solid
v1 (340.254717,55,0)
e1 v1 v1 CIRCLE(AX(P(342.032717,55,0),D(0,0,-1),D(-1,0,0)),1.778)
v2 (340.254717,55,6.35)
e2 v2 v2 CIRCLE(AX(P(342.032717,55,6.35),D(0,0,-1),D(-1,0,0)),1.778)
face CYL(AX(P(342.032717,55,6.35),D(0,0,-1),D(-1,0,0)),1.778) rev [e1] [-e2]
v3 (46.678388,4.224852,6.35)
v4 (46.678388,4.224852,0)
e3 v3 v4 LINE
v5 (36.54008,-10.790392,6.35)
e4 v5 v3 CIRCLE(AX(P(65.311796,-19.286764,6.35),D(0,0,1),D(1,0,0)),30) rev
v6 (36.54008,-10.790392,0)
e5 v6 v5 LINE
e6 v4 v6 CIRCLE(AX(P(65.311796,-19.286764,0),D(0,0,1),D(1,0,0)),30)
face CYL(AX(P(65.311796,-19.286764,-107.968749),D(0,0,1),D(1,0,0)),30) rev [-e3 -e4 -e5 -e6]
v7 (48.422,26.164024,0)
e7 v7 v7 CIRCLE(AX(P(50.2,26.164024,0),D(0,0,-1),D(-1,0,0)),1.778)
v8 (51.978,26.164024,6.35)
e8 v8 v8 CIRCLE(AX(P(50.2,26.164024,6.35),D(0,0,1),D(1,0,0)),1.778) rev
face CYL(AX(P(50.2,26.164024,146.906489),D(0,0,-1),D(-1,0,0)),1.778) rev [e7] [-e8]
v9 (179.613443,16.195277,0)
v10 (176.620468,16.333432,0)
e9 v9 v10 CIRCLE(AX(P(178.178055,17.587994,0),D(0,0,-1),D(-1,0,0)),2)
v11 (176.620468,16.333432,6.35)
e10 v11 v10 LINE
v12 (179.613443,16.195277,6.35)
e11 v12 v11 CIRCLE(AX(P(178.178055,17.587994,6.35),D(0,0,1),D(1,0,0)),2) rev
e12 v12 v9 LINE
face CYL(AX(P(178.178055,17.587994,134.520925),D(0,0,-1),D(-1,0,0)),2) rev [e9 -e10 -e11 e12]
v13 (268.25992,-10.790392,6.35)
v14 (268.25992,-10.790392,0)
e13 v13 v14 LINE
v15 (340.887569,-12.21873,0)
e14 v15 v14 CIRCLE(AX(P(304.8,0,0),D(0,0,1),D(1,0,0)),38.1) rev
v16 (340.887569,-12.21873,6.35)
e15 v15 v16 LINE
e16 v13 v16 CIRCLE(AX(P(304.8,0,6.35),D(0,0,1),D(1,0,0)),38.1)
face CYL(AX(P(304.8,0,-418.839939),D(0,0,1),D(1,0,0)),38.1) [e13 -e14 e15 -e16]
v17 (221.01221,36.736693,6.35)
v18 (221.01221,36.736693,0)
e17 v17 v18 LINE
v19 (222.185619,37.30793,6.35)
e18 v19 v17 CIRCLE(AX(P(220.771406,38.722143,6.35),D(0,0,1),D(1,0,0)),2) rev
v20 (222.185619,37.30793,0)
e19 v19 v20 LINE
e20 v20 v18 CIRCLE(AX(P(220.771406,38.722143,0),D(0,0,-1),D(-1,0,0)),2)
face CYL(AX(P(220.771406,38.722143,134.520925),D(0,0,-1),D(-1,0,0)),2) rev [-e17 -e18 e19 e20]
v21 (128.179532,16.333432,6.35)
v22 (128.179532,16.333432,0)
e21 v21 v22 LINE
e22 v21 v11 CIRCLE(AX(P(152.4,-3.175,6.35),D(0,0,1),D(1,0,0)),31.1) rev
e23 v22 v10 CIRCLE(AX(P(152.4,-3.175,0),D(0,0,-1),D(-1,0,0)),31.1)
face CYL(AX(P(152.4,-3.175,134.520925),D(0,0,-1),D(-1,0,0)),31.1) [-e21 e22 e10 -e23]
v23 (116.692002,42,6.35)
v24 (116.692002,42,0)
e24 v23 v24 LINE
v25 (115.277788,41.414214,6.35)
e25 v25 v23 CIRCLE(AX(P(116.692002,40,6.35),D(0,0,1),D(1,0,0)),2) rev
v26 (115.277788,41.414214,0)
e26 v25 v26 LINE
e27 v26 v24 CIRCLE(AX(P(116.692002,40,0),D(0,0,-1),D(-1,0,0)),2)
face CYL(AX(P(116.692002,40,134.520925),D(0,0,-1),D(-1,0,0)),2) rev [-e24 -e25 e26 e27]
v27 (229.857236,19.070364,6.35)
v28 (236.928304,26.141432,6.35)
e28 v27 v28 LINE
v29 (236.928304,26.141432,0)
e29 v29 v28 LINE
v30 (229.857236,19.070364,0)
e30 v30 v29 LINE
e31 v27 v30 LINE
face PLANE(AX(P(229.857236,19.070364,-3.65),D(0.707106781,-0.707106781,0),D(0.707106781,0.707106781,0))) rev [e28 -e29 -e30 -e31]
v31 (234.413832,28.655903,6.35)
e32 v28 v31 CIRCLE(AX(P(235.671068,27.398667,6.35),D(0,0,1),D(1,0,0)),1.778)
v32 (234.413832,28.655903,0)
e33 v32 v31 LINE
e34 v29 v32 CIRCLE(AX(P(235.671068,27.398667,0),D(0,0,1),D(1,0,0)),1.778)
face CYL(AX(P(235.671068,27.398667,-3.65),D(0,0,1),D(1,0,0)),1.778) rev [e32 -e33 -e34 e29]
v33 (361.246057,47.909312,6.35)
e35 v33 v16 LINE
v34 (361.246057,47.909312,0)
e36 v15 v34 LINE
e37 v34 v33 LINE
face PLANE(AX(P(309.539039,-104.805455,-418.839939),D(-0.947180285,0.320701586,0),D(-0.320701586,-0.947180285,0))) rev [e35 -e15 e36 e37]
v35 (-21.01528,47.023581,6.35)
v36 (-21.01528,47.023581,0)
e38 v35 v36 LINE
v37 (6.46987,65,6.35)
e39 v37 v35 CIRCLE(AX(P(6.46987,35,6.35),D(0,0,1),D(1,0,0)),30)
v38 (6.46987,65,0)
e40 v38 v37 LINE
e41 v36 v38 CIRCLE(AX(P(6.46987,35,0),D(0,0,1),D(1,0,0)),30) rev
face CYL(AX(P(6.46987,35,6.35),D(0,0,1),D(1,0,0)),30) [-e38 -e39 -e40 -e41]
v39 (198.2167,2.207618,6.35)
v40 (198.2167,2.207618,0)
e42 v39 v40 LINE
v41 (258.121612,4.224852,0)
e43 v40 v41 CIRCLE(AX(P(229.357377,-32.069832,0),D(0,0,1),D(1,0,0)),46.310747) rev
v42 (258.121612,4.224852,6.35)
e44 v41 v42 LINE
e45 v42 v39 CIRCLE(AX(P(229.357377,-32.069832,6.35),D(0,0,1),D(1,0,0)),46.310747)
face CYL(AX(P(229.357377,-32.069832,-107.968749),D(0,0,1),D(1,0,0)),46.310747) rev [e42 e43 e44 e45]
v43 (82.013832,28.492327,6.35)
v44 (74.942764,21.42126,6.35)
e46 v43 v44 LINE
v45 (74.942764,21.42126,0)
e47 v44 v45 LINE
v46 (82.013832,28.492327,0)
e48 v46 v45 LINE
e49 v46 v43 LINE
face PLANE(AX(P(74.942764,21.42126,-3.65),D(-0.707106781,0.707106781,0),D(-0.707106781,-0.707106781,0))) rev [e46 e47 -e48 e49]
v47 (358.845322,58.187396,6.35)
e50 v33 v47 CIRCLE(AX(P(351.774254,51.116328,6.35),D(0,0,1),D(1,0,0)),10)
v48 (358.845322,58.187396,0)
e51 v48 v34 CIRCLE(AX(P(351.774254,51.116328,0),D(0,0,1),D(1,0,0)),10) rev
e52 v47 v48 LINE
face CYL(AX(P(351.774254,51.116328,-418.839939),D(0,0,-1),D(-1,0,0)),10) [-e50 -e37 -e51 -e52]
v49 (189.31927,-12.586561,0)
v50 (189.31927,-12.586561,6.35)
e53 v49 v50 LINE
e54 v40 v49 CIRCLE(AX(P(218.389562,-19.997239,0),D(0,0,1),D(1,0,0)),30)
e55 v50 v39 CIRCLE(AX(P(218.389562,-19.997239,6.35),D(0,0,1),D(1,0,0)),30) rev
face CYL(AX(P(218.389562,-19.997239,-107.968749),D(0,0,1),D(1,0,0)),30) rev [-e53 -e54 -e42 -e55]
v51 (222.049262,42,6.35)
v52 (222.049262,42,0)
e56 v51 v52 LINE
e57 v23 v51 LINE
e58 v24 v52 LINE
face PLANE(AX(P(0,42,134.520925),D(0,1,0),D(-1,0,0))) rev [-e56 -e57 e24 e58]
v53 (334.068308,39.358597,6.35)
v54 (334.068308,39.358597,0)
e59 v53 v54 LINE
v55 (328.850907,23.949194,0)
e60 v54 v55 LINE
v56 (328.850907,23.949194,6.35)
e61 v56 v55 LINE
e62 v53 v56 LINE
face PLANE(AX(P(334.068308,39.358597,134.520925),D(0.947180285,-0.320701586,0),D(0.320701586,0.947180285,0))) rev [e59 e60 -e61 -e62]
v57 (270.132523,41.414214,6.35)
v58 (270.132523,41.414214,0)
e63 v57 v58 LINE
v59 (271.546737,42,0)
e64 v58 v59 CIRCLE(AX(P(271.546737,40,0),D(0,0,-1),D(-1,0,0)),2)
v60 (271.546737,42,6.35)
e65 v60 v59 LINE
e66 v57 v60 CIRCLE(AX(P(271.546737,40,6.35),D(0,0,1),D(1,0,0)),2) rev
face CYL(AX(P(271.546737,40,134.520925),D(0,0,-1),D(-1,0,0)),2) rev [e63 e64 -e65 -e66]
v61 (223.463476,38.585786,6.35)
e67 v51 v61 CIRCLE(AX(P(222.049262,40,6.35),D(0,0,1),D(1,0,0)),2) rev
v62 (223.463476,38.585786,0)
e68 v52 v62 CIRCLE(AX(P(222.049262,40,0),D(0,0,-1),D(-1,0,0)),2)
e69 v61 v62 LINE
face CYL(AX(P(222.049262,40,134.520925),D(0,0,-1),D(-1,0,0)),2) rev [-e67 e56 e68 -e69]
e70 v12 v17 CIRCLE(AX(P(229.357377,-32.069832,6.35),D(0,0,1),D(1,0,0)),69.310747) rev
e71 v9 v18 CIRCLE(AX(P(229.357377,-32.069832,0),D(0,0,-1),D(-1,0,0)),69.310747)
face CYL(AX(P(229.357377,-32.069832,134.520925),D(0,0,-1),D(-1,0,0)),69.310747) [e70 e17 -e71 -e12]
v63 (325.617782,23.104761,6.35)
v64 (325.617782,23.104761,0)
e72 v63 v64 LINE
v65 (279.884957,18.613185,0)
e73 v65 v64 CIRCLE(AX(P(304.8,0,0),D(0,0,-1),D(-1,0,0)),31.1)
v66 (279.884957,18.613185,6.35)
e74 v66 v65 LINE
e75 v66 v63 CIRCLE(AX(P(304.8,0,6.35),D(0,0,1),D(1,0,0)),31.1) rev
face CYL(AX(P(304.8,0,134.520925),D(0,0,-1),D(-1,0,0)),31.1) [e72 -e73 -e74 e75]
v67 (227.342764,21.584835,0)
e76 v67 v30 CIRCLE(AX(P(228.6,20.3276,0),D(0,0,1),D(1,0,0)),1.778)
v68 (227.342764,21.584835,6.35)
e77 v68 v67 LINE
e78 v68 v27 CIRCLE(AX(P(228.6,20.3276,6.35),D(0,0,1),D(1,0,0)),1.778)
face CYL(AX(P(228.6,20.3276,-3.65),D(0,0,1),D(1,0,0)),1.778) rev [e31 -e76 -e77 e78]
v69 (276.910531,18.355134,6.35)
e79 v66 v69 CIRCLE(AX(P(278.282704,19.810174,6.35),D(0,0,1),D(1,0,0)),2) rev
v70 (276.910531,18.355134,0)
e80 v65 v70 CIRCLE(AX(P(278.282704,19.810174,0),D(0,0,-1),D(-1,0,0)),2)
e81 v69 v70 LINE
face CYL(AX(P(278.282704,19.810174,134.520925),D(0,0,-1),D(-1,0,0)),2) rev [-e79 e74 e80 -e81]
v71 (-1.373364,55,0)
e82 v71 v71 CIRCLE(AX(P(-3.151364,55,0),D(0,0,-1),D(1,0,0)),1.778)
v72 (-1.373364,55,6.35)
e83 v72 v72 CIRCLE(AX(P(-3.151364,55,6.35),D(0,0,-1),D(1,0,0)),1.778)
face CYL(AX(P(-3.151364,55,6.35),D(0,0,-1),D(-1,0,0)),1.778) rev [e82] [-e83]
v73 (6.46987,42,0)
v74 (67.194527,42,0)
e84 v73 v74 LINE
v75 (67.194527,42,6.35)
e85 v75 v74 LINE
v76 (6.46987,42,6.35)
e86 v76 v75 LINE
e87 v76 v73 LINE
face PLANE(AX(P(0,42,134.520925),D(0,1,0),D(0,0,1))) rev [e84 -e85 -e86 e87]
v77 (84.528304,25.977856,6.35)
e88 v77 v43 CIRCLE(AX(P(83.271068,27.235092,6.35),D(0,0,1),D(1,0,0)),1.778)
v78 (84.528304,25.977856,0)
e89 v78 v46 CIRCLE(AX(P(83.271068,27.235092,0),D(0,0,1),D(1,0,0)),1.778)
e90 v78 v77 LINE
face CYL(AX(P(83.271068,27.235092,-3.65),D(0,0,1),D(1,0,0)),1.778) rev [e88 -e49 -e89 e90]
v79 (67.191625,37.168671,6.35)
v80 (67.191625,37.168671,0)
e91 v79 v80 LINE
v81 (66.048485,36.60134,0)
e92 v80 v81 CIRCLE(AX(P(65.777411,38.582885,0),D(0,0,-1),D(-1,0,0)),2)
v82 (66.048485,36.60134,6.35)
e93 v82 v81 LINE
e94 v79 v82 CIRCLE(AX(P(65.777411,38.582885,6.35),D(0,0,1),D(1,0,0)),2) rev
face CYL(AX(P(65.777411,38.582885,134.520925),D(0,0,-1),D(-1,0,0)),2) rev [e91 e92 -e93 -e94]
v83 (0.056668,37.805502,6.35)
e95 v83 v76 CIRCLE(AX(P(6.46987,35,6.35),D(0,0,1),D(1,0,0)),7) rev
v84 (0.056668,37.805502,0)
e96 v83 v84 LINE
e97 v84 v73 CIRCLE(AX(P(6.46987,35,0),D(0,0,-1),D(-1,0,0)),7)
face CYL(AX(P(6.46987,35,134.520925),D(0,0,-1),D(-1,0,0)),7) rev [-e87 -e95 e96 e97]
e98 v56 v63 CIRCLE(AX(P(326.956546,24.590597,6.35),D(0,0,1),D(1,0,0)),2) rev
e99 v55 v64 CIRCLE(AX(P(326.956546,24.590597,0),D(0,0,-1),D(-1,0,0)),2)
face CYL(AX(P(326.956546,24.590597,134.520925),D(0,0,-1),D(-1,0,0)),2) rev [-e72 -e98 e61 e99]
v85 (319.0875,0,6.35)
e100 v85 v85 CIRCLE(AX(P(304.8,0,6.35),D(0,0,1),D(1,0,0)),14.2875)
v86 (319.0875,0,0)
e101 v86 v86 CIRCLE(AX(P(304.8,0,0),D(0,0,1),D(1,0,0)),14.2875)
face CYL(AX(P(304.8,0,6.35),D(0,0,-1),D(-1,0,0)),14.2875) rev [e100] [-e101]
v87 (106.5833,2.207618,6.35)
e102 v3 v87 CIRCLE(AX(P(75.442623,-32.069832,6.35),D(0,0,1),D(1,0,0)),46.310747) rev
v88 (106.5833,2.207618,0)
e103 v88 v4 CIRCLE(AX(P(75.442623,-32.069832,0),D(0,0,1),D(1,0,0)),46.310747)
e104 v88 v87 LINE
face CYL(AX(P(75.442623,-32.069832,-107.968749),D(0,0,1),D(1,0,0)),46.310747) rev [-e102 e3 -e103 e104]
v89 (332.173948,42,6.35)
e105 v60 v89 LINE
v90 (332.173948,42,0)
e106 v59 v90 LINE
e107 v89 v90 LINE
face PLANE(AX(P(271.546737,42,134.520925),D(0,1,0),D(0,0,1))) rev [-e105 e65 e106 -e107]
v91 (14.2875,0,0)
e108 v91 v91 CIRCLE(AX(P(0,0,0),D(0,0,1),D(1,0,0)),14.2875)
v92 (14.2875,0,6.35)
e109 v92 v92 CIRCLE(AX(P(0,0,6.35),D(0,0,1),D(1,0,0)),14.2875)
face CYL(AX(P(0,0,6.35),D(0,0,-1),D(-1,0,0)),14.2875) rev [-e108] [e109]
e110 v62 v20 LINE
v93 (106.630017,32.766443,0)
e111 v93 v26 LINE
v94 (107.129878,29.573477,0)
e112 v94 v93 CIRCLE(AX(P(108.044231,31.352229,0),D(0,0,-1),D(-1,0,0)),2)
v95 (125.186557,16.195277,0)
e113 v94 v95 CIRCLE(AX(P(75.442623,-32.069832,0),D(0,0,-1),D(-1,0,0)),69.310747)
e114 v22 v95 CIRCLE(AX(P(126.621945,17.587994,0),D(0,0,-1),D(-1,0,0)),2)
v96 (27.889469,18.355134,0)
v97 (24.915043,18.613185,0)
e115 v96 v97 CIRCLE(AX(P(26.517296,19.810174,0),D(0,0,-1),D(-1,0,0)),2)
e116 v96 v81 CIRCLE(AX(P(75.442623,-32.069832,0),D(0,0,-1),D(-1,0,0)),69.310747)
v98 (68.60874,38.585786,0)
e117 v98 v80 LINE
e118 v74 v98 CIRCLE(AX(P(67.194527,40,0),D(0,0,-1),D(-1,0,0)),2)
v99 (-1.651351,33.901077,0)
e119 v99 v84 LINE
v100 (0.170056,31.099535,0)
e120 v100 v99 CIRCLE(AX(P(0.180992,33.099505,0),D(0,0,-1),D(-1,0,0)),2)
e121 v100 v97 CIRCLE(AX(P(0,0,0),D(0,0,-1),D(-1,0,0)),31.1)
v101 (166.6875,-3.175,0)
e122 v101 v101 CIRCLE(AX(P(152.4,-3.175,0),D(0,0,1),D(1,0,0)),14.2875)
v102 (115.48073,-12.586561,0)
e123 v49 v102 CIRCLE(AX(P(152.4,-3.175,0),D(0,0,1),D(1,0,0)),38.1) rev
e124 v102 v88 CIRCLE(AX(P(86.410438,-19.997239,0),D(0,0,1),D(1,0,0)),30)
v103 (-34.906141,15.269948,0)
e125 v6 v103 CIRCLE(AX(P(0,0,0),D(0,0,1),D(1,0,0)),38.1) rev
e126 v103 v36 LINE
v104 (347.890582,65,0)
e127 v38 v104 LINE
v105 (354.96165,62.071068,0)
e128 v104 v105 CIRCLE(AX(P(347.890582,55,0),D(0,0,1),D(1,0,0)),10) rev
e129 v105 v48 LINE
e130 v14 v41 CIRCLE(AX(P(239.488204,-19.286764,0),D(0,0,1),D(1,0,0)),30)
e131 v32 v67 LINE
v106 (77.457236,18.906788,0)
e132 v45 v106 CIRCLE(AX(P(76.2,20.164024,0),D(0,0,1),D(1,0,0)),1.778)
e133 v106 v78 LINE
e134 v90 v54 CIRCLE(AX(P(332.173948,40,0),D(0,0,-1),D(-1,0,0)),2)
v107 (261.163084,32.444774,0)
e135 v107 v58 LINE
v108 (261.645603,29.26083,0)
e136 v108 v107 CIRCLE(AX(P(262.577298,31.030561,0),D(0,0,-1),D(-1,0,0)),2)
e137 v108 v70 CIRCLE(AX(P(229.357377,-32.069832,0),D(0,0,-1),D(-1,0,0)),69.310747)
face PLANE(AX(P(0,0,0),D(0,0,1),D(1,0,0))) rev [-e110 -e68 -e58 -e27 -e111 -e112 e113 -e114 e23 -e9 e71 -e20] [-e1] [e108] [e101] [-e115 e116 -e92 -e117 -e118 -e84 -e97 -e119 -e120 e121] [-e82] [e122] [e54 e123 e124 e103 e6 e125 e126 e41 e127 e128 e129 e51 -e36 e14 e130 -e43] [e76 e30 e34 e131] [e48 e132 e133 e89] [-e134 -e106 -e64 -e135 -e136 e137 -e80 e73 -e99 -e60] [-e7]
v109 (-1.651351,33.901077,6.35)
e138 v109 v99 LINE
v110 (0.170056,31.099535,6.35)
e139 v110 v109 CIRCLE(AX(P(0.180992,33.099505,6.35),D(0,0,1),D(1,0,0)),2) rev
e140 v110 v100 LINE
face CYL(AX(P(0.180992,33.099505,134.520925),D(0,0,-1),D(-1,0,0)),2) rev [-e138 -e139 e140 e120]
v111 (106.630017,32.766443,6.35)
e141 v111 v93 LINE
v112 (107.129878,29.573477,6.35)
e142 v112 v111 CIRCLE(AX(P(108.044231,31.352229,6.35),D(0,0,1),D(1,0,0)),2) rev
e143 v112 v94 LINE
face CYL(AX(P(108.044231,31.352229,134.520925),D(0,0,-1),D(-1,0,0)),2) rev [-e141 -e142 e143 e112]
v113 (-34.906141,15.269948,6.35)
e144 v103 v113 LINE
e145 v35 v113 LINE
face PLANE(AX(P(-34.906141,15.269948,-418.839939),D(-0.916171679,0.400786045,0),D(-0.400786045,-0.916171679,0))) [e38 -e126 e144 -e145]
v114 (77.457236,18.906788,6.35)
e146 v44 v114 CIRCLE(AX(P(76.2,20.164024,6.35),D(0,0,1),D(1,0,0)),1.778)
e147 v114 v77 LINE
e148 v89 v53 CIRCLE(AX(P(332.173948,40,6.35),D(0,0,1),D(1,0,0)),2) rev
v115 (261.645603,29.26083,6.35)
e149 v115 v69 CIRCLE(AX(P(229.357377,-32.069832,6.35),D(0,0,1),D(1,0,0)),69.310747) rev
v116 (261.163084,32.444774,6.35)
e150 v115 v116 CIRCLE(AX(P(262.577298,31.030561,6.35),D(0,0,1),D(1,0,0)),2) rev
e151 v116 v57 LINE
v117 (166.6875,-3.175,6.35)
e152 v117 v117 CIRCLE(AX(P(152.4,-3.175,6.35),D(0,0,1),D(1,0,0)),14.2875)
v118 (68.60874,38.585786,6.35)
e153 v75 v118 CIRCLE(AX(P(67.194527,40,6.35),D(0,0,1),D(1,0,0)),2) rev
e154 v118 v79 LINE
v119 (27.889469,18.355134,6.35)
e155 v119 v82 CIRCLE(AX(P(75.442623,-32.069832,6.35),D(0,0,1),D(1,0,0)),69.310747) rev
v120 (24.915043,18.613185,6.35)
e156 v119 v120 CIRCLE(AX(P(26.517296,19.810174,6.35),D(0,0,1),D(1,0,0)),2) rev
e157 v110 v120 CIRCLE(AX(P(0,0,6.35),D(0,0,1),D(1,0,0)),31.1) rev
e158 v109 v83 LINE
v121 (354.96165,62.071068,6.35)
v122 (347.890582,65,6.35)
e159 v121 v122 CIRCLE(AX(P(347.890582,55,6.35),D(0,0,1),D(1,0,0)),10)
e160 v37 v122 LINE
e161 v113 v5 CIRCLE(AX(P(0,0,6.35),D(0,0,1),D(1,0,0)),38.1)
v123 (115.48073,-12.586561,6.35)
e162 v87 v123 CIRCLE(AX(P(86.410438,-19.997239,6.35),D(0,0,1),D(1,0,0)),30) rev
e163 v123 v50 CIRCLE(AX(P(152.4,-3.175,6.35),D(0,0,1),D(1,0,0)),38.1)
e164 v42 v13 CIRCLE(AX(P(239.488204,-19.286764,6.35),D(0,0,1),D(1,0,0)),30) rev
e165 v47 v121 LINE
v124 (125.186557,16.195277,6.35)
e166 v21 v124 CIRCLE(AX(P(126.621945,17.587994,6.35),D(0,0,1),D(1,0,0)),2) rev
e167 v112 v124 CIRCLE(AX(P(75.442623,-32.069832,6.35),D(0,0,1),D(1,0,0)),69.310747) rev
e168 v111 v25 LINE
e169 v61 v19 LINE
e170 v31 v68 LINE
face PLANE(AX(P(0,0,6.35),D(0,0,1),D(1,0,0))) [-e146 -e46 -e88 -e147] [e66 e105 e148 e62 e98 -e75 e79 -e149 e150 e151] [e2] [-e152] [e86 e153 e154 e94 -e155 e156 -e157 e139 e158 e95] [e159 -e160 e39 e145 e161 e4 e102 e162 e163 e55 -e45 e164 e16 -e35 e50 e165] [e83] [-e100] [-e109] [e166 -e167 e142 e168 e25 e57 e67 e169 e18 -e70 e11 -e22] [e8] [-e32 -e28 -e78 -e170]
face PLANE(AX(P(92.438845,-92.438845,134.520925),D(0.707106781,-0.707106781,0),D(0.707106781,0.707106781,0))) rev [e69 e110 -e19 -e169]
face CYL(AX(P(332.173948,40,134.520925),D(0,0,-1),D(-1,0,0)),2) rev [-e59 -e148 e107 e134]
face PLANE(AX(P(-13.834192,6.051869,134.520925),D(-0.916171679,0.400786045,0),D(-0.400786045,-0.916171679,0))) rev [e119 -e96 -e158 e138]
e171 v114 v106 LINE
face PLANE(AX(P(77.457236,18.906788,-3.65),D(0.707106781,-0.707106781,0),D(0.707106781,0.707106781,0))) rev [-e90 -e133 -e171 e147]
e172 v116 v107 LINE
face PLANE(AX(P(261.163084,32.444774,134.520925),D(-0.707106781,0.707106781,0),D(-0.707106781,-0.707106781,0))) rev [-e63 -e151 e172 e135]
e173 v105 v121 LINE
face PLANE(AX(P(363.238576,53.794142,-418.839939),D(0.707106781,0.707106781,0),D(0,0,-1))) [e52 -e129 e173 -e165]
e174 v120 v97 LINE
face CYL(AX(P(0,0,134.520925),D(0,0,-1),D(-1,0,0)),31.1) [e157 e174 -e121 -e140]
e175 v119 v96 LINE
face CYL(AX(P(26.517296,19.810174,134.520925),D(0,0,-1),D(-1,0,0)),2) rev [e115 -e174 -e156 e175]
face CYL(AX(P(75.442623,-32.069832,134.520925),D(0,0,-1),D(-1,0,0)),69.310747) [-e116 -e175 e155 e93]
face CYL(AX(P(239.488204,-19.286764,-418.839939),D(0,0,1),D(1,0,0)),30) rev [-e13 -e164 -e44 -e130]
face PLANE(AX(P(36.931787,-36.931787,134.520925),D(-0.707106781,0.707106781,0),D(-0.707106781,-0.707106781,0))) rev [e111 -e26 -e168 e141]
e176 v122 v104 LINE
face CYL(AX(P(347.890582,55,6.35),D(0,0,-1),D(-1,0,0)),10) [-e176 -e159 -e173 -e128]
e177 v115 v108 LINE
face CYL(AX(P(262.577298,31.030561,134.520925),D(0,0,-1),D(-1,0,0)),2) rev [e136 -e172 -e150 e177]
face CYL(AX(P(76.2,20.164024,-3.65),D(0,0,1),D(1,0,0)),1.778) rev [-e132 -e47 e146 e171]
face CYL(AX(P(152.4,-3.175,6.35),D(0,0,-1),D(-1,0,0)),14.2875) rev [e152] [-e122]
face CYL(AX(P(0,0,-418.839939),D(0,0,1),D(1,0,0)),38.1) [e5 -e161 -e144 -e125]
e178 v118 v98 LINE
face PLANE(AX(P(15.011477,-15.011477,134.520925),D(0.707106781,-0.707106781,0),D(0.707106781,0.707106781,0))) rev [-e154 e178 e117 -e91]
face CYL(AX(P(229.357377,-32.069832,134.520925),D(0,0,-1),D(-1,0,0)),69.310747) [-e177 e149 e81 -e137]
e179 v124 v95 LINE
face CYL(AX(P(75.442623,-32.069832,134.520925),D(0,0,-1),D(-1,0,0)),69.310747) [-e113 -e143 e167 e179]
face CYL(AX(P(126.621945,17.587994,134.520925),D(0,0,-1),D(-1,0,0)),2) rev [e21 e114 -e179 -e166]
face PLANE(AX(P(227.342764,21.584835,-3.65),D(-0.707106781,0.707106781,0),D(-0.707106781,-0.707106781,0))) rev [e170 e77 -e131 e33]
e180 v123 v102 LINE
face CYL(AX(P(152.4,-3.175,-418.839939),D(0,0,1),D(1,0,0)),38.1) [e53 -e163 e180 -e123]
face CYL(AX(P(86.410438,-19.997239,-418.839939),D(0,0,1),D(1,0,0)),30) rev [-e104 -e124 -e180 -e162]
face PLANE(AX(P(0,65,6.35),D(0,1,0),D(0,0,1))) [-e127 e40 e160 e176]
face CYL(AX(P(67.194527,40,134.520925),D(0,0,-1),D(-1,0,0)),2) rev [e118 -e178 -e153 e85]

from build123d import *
from build123d.topology import SkipClean

# Parameters (mm, degrees)
SKETCH1_R           = 14.2875
BOSS_EXTRUDE1_DEPTH = 6.35
FILLET1_R           = 10
FILLET2_R           = 20
SKETCH2_R           = 1.778
CUT_EXTRUDE1_DEPTH  = 6.35
FILLET4_R           = 28.4734
BOSS_EXTRUDE2_DEPTH = 6.35
FILLET7_R           = 30
CUT_EXTRUDE4_DEPTH  = 6.35
FILLET9_DEPTH       = 6.35
SKETCH6_R           = 1.778
CUT_EXTRUDE5_DEPTH  = 10
CHAMFER1_SIZE       = 15
CHAMFER1_SIZE2      = 11.830755168
FILLET11_R          = 10
BOSS_EXTRUDE3_DEPTH = 6.35
SKETCH8_R           = 1.778
BOSS_EXTRUDE4_DEPTH = 6.35
CUT_EXTRUDE6_DEPTH  = 10
FILLET12_R          = 10
FILLET13_R          = 10
FILLET14_R          = 10
FILLET15_R          = 10
FILLET16_R          = 10
CUT_EXTRUDE7_DEPTH  = 10
BOSS_EXTRUDE5_START = -6.35
SKETCH10_R          = 1.778
BOSS_EXTRUDE5_DEPTH = 6.35
FILLET17_R          = 30
BOSS_EXTRUDE6_START = -6.35
BOSS_EXTRUDE6_DEPTH = 6.35


with BuildPart() as part:
    # Sketch1 → Boss-Extrude1 (new body)
    with BuildSketch(Plane.XY):
        with BuildLine():
            Line((76.2, 30), (19.765397885, -21.612188753))
            ThreePointArc((19.765397885, -21.612188753), (-7.664310495, -28.266871084), (-27.975511048, -8.66766623))
            Line((-27.975511048, -8.66766623), (-30.661018302, 0))
            Line((-30.661018302, 0), (-10.522036605, 65))
            Line((-10.522036605, 65), (355.6, 65))
            Line((355.6, 65), (332.775511048, -8.66766623))
            ThreePointArc((332.775511048, -8.66766623), (312.464310495, -28.266871084), (285.034602115, -21.612188753))
            Line((285.034602115, -21.612188753), (228.6, 30))
            Line((228.6, 30), (172.803916322, -24.185422532))
            ThreePointArc((172.803916322, -24.185422532), (152.4, -32.637001398), (131.996083678, -24.185422532))
            Line((131.996083678, -24.185422532), (76.2, 30))
        make_face()
        Circle(SKETCH1_R, mode=Mode.SUBTRACT)
        with Locations((152.4, -3.175)):
            Circle(SKETCH1_R, mode=Mode.SUBTRACT)
        with Locations((304.8, 0)):
            Circle(SKETCH1_R, mode=Mode.SUBTRACT)
    extrude(amount=BOSS_EXTRUDE1_DEPTH)

    # Fillet1
    fillet1_edges = [part.edges().sort_by_distance(p)[0] for p in [
        (-10.522036605, 65, 3.175),
        (355.6, 65, 3.175),
    ]]
    fillet(fillet1_edges, radius=FILLET1_R)

    # Fillet2
    fillet2_edges = [part.edges().sort_by_distance(p)[0] for p in [
        (228.6, 30, 3.175),
        (76.2, 30, 3.175),
    ]]
    fillet(fillet2_edges, radius=FILLET2_R)

    # Sketch2 → Cut-Extrude1 (cut)
    with BuildSketch(Plane(origin=(0, 0, 0), x_dir=(-1, 0, 0), z_dir=(0, 0, -1))):
        with Locations((-229.01165953, 23.51851186)):
            Circle(SKETCH2_R)
        with Locations((-342.03271747, 55)):
            Circle(SKETCH2_R)
        with Locations((-76.34605429, 23.51851186)):
            Circle(SKETCH2_R)
        with Locations(Location((3.151363828, 55, 0), (0, 0, 180))):
            Circle(SKETCH2_R)
    extrude(amount=-CUT_EXTRUDE1_DEPTH, mode=Mode.SUBTRACT)

    # Fillet4
    fillet4_edges = [part.edges().sort_by_distance(p)[0] for p in [
        (-30.661018302, 0, 3.175),
    ]]
    fillet(fillet4_edges, radius=FILLET4_R)

    # Sketch4 → Boss-Extrude2 (add)
    with BuildSketch(Plane.XY.offset(6.35)):
        with BuildLine():
            ThreePointArc((-12.703394916, 57.95951045), (-9.084528898, 63.04969268), (-3.151363828, 65))
            Line((-3.151363828, 65), (-13.151363828, 65))
            Line((-13.151363828, 65), (-34.906140988, 15.269948308))
            ThreePointArc((-34.906140988, 15.269948308), (-10.316360553, -36.676732474), (37.748130536, -5.166105019))
            Line((37.748130536, -5.166105019), (19.765397885, -21.612188753))
            ThreePointArc((19.765397885, -21.612188753), (-7.664310495, -28.266871084), (-27.975511048, -8.66766623))
            Line((-27.975511048, -8.66766623), (-28.050159667, -8.426732485))
            ThreePointArc((-28.050159667, -8.426732485), (-29.325679471, 0), (-28.050159667, 8.426732485))
            Line((-28.050159667, 8.426732485), (-12.703394916, 57.95951045))
        make_face()
        with BuildLine():
            Line((367.03271747, 65), (342.03271747, 65))
            ThreePointArc((342.03271747, 65), (350.08241015, 60.93316507), (351.584748558, 52.04048955))
            Line((351.584748558, 52.04048955), (332.775511048, -8.66766623))
            ThreePointArc((332.775511048, -8.66766623), (312.464310495, -28.266871084), (285.034602115, -21.612188753))
            Line((285.034602115, -21.612188753), (267.051869464, -5.166105019))
            ThreePointArc((267.051869464, -5.166105019), (301.177259665, -37.927374711), (340.887568868, -12.218730424))
            Line((340.887568868, -12.218730424), (367.03271747, 65))
        make_face()
        with BuildLine():
            Line((62.290842982, 17.279399331), (60.592342389, 15.72603792))
            Line((60.592342389, 15.72603792), (68.130864542, 20.996768873))
            ThreePointArc((68.130864542, 20.996768873), (65.048790473, 19.392687011), (62.290842982, 17.279399331))
        make_face()
        with BuildLine():
            ThreePointArc((74.888341467, 22.500495492), (71.444046197, 22.043232685), (68.130864542, 20.996768873))
            Line((68.130864542, 20.996768873), (105.753753933, 1.29937195))
            Line((105.753753933, 1.29937195), (89.721872743, 16.868462091))
            ThreePointArc((89.721872743, 16.868462091), (84.206374965, 20.662880592), (77.747671619, 22.424549857))
            ThreePointArc((77.747671619, 22.424549857), (76.393262458, 25.295885031), (74.888341467, 22.500495492))
        make_face()
        with BuildLine():
            Line((220.832871891, 20.771986703), (256.207126926, 4.751939547))
            Line((256.207126926, 4.751939547), (242.509157018, 17.279399331))
            ThreePointArc((242.509157018, 17.279399331), (236.916143222, 20.892449631), (230.446997722, 22.469184326))
            ThreePointArc((230.446997722, 22.469184326), (229.01165953, 25.29651186), (227.576321337, 22.469184326))
            ThreePointArc((227.576321337, 22.469184326), (224.130268968, 21.915910418), (220.832871891, 20.771986703))
        make_face()
        with BuildLine():
            Line((211.556759647, 13.448745522), (220.832871891, 20.771986703))
            ThreePointArc((220.832871891, 20.771986703), (217.784547298, 19.072249628), (215.078127257, 16.868462091))
            Line((215.078127257, 16.868462091), (211.556759647, 13.448745522))
        make_face()
        with BuildLine():
            Line((131.996083678, -24.185422532), (114.514059271, -7.208050345))
            ThreePointArc((114.514059271, -7.208050345), (152.4, -41.275), (190.285940729, -7.208050345))
            Line((190.285940729, -7.208050345), (172.803916322, -24.185422532))
            ThreePointArc((172.803916322, -24.185422532), (152.4, -32.637001398), (131.996083678, -24.185422532))
        make_face()
    extrude(amount=-BOSS_EXTRUDE2_DEPTH)

    # Fillet7
    # the kernel refuses this fillet: 30 mm, written as the material it adds along each edge
    with BuildSketch(Plane(origin=(220.832871891, 20.771986703, 6.35), x_dir=(-0.7848829847834699, -0.6196440108621978, 0), z_dir=(0, 0, -1))) as fillet7_piece_1:
        with BuildLine():
            CenterArc((18.669895515, -29.207154991), FILLET7_R, 103.201773783, 49.45286053)
            Line((-7.977718615, -15.426564975), (0, 0))
            Line((0, 0), (11.818465203, 0))
        make_face()
    extrude(amount=6.35)
    with BuildSketch(Plane(origin=(68.130864542, 20.996768873, 6.35), x_dir=(-0.819550218760279, -0.5730073637659283, 0), z_dir=(0, 0, -1))) as fillet7_piece_2:
        with BuildLine():
            CenterArc((19.112116789, -28.314616862), FILLET7_R, 109.296600171, 43.297831689)
            Line((-7.521002941, -14.506034983), (0, 0))
            Line((0, 0), (9.198365128, 0))
        make_face()
    extrude(amount=6.35)
    # the kernel refuses this fillet: 30 mm, written as the material it takes off along each edge
    with BuildSketch(Plane(origin=(-13.151363828, 65, 55.403084312), x_dir=(-0.4007860448353176, -0.9161716794713002, 0), z_dir=(0, 0, -1))) as fillet7_2_piece_1:
        with BuildLine():
            CenterArc((FILLET7_R * 0.65404112416, -FILLET7_R), FILLET7_R, 90, 66.372672864)
            Line((-FILLET7_R * 0.262130555312, -FILLET7_R * 0.599213955165), (0, 0))
            Line((0, 0), (FILLET7_R * 0.65404112416, 0))
        make_face()
    extrude(amount=104.456168624, mode=Mode.SUBTRACT)

    # Sketch5 → Cut-Extrude4 (cut)
    with BuildSketch(Plane.XY.offset(6.35)):
        with BuildLine():
            ThreePointArc((202.727550006, 25.783673337), (222.609463156, 31.248183301), (242.841525508, 27.271376461))
            Line((242.841525508, 27.271376461), (264.569178734, 17.431507638))
            Line((264.569178734, 17.431507638), (281.763141289, 1.706792524))
            ThreePointArc((281.763141289, 1.706792524), (305.653980027, 23.084209281), (327.9, 0))
            ThreePointArc((327.9, 0), (327.592925131, -3.754006392), (326.679864589, -7.408206635))
            Line((326.679864589, -7.408206635), (346.117455511, 50))
            Line((346.117455511, 50), (6.469869897, 50))
            ThreePointArc((6.469869897, 50), (-1.740585021, 47.553423041), (-7.272705295, 41.011790673))
            Line((-7.272705295, 41.011790673), (-21.163565796, 9.258157636))
            ThreePointArc((-21.163565796, 9.258157636), (3.890126649, 22.770088156), (23.036858711, 1.706792524))
            Line((23.036858711, 1.706792524), (52.825875761, 28.950297628))
            ThreePointArc((52.825875761, 28.950297628), (71.4348738, 31.756464685), (89.564149012, 26.706834809))
            Line((89.564149012, 26.706834809), (114.641099784, 13.577841769))
            Line((114.641099784, 13.577841769), (129.424605527, -0.77890968))
            ThreePointArc((129.424605527, -0.77890968), (152.4, 19.925), (175.375394473, -0.77890968))
            Line((175.375394473, -0.77890968), (202.727550006, 25.783673337))
        make_face()
    extrude(amount=-CUT_EXTRUDE4_DEPTH, mode=Mode.SUBTRACT)

    # Fillet9: read off the stored shape, not the designer's step
    # Fillet9 outline → Fillet9 (add)
    with BuildSketch(Plane.XY):
        with BuildLine():
            Line((346.117455511, 50), (332.173947538, 50))
            ThreePointArc((332.173947538, 50), (340.300144637, 45.827943094), (341.64575039, 36.792984141))
            Line((341.64575039, 36.792984141), (346.117455511, 50))
        make_face()
        with BuildLine():
            Line((326.679864589, -7.408206635), (336.428348814, 21.383581349))
            ThreePointArc((336.428348814, 21.383581349), (329.483593888, 14.915162915), (320.262725429, 17.161413762))
            ThreePointArc((320.262725429, 17.161413762), (327.150253218, 5.837480712), (326.679864589, -7.408206635))
        make_face()
        with BuildLine():
            ThreePointArc((0.126311649, 23.099654659), (-8.202890478, 27.648769951), (-8.980724779, 37.107365609))
            Line((-8.980724779, 37.107365609), (-21.163565796, 9.258157636))
            ThreePointArc((-21.163565796, 9.258157636), (-12.591198333, 19.366768562), (0.126311649, 23.099654659))
        make_face()
    extrude(amount=FILLET9_DEPTH)

    # Sketch6 → Cut-Extrude5 (cut)
    with BuildSketch(Plane.XY.offset(6.35)):
        with Locations((76.2, 20.164023691)):
            Circle(SKETCH6_R)
        with Locations((228.6, 20.32759964)):
            Circle(SKETCH6_R)
    extrude(amount=-CUT_EXTRUDE5_DEPTH, mode=Mode.SUBTRACT)

    # Chamfer1
    chamfer1_edges = [part.edges().sort_by_distance(p)[0] for p in [
        (367.03271747, 65, 3.175),
    ]]
    chamfer1_side = [part.faces().sort_by_distance(p)[0] for p in [
        (186.751293683, 65, 3.175),
    ]]
    chamfer(chamfer1_edges, length=CHAMFER1_SIZE, length2=CHAMFER1_SIZE2, reference=chamfer1_side[0])

    # Fillet11
    fillet11_edges = [part.edges().sort_by_distance(p)[0] for p in [
        (363.238575525, 53.794141945, 3.175),
        (352.03271747, 65, 3.175),
    ]]
    fillet(fillet11_edges, radius=FILLET11_R)

    # Sketch7 → Boss-Extrude3 (add)
    with BuildSketch(Plane.XY.offset(6.35)):
        Polygon((100.225182041, 58.888519513), (69.228437645, 27.891775117), (86.023226415, 23.473360451), (115.72256861, 53.172702646), align=None)
        Polygon((224.083172996, 27.891775117), (239.038298252, 21.633696938), (270.57730396, 53.172702646), (247.971808558, 51.78041068), align=None)
    extrude(amount=-BOSS_EXTRUDE3_DEPTH)

    # Sketch8 → Boss-Extrude4 (add)
    # profile 1 of 8: a face of its own
    with BuildSketch(Plane.XY.offset(6.35)):
        with BuildLine():
            Line((42.965540082, 19.932541018), (26.540335697, 4.910892646))
            ThreePointArc((26.540335697, 4.910892646), (26.03493106, 4.232890698), (25.538925832, 3.547982455))
            Line((25.538925832, 3.547982455), (37.748130536, -5.166105019))
            ThreePointArc((37.748130536, -5.166105019), (44.188663643, 2.104358832), (52.003991477, 7.871573252))
            Line((52.003991477, 7.871573252), (60.592342389, 15.72603792))
            ThreePointArc((60.592342389, 15.72603792), (71.406290885, 16.717093686), (81.86459706, 13.793481951))
            ThreePointArc((81.86459706, 13.793481951), (100.496139451, 6.878937362), (114.514059271, -7.208050345))
            Line((114.514059271, -7.208050345), (127.169254419, 0.844653286))
            ThreePointArc((127.169254419, 0.844653286), (126.658671717, 1.633641021), (126.136055565, 2.414709969))
            Line((126.136055565, 2.414709969), (114.641099784, 13.577841769))
            Line((114.641099784, 13.577841769), (89.564149012, 26.706834809))
            ThreePointArc((89.564149012, 26.706834809), (89.463102992, 26.759574333), (89.361923711, 26.812057747))
            Line((89.361923711, 26.812057747), (90.030119482, 27.480253519))
            ThreePointArc((90.030119482, 27.480253519), (80.261374749, 29.051255746), (70.367134521, 29.030471993))
            ThreePointArc((70.367134521, 29.030471993), (56.12315118, 26.117501091), (42.965540082, 19.932541018))
        make_face()
        with Locations((76.2, 20.164023691)):
            Circle(SKETCH8_R, mode=Mode.SUBTRACT)
    # profile 2 of 8: a face of its own
    with BuildSketch(Plane.XY.offset(6.35)):
        with BuildLine():
            ThreePointArc((126.136055565, 2.414709969), (110.406465662, 18.294217169), (90.030119482, 27.480253519))
            Line((90.030119482, 27.480253519), (89.361923711, 26.812057747))
            ThreePointArc((89.361923711, 26.812057747), (89.463102992, 26.759574333), (89.564149012, 26.706834809))
            Line((89.564149012, 26.706834809), (114.641099784, 13.577841769))
            Line((114.641099784, 13.577841769), (126.136055565, 2.414709969))
        make_face()
    # profile 3 of 8: a face of its own
    with BuildSketch(Plane.XY.offset(6.35)):
        with BuildLine():
            Line((60.592342389, 15.72603792), (52.003991477, 7.871573252))
            ThreePointArc((52.003991477, 7.871573252), (66.43379909, 13.356222223), (81.86459706, 13.793481951))
            ThreePointArc((81.86459706, 13.793481951), (71.406290885, 16.717093686), (60.592342389, 15.72603792))
        make_face()
    # profile 4 of 8: a face of its own
    with BuildSketch(Plane.XY.offset(6.35)):
        with BuildLine():
            Line((196.372099466, 19.611685086), (178.663944435, 2.414709969))
            ThreePointArc((178.663944435, 2.414709969), (178.141328283, 1.633641021), (177.630745581, 0.844653286))
            Line((177.630745581, 0.844653286), (190.285940729, -7.208050345))
            ThreePointArc((190.285940729, -7.208050345), (197.093762385, 1.152818304), (205.650401581, 7.712885828))
            Line((205.650401581, 7.712885828), (211.556759647, 13.448745522))
            ThreePointArc((211.556759647, 13.448745522), (223.983698914, 16.277662761), (236.463614039, 13.692452762))
            ThreePointArc((236.463614039, 13.692452762), (253.661443339, 7.350945008), (267.051869464, -5.166105019))
            Line((267.051869464, -5.166105019), (279.261074168, 3.547982455))
            ThreePointArc((279.261074168, 3.547982455), (278.76506894, 4.232890698), (278.259664303, 4.910892646))
            Line((278.259664303, 4.910892646), (264.569178734, 17.431507638))
            Line((264.569178734, 17.431507638), (244.104163185, 26.699561871))
            Line((244.104163185, 26.699561871), (244.695857174, 27.29125586))
            ThreePointArc((244.695857174, 27.29125586), (235.069370607, 28.974257477), (225.297764534, 29.106366656))
            ThreePointArc((225.297764534, 29.106366656), (210.236231282, 26.182975027), (196.372099466, 19.611685086))
        make_face()
        with Locations((228.6, 20.32759964)):
            Circle(SKETCH8_R, mode=Mode.SUBTRACT)
    # profile 5 of 8: a face of its own
    with BuildSketch(Plane.XY.offset(6.35)):
        with BuildLine():
            Line((211.556759647, 13.448745522), (205.650401581, 7.712885828))
            ThreePointArc((205.650401581, 7.712885828), (220.5349661, 13.392794234), (236.463614039, 13.692452762))
            ThreePointArc((236.463614039, 13.692452762), (223.983698914, 16.277662761), (211.556759647, 13.448745522))
        make_face()
    # profile 6 of 8: a face of its own
    with BuildSketch(Plane.XY.offset(6.35)):
        with BuildLine():
            ThreePointArc((278.259664303, 4.910892646), (263.371186182, 18.940642396), (244.695857174, 27.29125586))
            Line((244.695857174, 27.29125586), (244.104163185, 26.699561871))
            Line((244.104163185, 26.699561871), (264.569178734, 17.431507638))
            Line((264.569178734, 17.431507638), (278.259664303, 4.910892646))
        make_face()
    # profile 7 of 8: a face of its own
    with BuildSketch(Plane.XY.offset(6.35)):
        with BuildLine():
            ThreePointArc((196.372099466, 19.611685086), (186.64361318, 11.913598089), (178.663944435, 2.414709969))
            Line((178.663944435, 2.414709969), (196.372099466, 19.611685086))
        make_face()
    # profile 8 of 8: a face of its own
    with BuildSketch(Plane.XY.offset(6.35)):
        with BuildLine():
            ThreePointArc((42.965540082, 19.932541018), (34.065540526, 13.173341548), (26.540335697, 4.910892646))
            Line((26.540335697, 4.910892646), (42.965540082, 19.932541018))
        make_face()
    extrude(amount=-BOSS_EXTRUDE4_DEPTH)

    # Sketch8<3> → Cut-Extrude6 (cut)
    with SkipClean():  # the faces are left unmerged after this step: merging them gives an invalid solid
        with BuildSketch(Plane.XY.offset(6.35)):
            with BuildLine():
                Line((26.540335697, 4.910892646), (23.036858711, 1.706792524))
                ThreePointArc((23.036858711, 1.706792524), (23.086771831, 0.781643421), (23.099546395, -0.144763074))
                ThreePointArc((23.099546395, -0.144763074), (24.756867192, 2.425991729), (26.540335697, 4.910892646))
            make_face()
            with BuildLine():
                Line((52.825875761, 28.950297628), (42.965540082, 19.932541018))
                ThreePointArc((42.965540082, 19.932541018), (56.12315118, 26.117501091), (70.367134521, 29.030471993))
                Line((70.367134521, 29.030471993), (72.972728384, 31.636065856))
                ThreePointArc((72.972728384, 31.636065856), (62.745683135, 31.445529161), (52.825875761, 28.950297628))
            make_face()
            with BuildLine():
                ThreePointArc((52.003991477, 7.871573252), (44.188663643, 2.104358832), (37.748130536, -5.166105019))
                Line((37.748130536, -5.166105019), (52.003991477, 7.871573252))
            make_face()
            with BuildLine():
                Line((105.753753933, 1.29937195), (114.514059271, -7.208050345))
                ThreePointArc((114.514059271, -7.208050345), (100.496139451, 6.878937362), (81.86459706, 13.793481951))
                ThreePointArc((81.86459706, 13.793481951), (82.236984648, 13.608280674), (82.606769012, 13.417934797))
                Line((82.606769012, 13.417934797), (105.753753933, 1.29937195))
            make_face()
            with BuildLine():
                ThreePointArc((126.136055565, 2.414709969), (127.78416506, -0.142246527), (129.303415047, -2.777805464))
                ThreePointArc((129.303415047, -2.777805464), (129.342339274, -1.777043687), (129.424605527, -0.77890968))
                Line((129.424605527, -0.77890968), (126.136055565, 2.414709969))
            make_face()
            with BuildLine():
                ThreePointArc((205.650401581, 7.712885828), (197.093762385, 1.152818304), (190.285940729, -7.208050345))
                Line((190.285940729, -7.208050345), (205.650401581, 7.712885828))
            make_face()
            with BuildLine():
                Line((256.207126926, 4.751939547), (267.051869464, -5.166105019))
                ThreePointArc((267.051869464, -5.166105019), (253.661443339, 7.350945008), (236.463614039, 13.692452762))
                ThreePointArc((236.463614039, 13.692452762), (236.558593891, 13.65003287), (236.653426084, 13.6072839))
                Line((236.653426084, 13.6072839), (256.207126926, 4.751939547))
            make_face()
            with BuildLine():
                ThreePointArc((175.496584953, -2.777805464), (177.01583494, -0.142246527), (178.663944435, 2.414709969))
                Line((178.663944435, 2.414709969), (175.375394473, -0.77890968))
                ThreePointArc((175.375394473, -0.77890968), (175.457660726, -1.777043687), (175.496584953, -2.777805464))
            make_face()
            with BuildLine():
                ThreePointArc((278.259664303, 4.910892646), (280.043132809, 2.425991728), (281.700453605, -0.144763074))
                ThreePointArc((281.700453605, -0.144763074), (281.713228169, 0.781643421), (281.763141289, 1.706792524))
                Line((281.763141289, 1.706792524), (278.259664303, 4.910892646))
            make_face()
            with BuildLine():
                Line((225.297764534, 29.106366656), (227.364470932, 31.173073053))
                ThreePointArc((227.364470932, 31.173073053), (214.660742934, 30.239572268), (202.727550006, 25.783673337))
                Line((202.727550006, 25.783673337), (196.372099466, 19.611685086))
                ThreePointArc((196.372099466, 19.611685086), (210.236231282, 26.182975027), (225.297764534, 29.106366656))
            make_face()
        extrude(amount=-CUT_EXTRUDE6_DEPTH, mode=Mode.SUBTRACT)

    # Fillet12
    fillet12_edges = [part.edges().sort_by_distance(p)[0] for p in [
        (23.099546395, -0.144763074, 3.175),
    ]]
    fillet(fillet12_edges, radius=FILLET12_R)

    # Fillet13
    fillet13_edges = [part.edges().sort_by_distance(p)[0] for p in [
        (129.303415047, -2.777805464, 3.175),
        (175.496584953, -2.777805464, 3.175),
        (281.700453605, -0.144763074, 3.175),
    ]]
    fillet(fillet13_edges, radius=FILLET13_R)

    # Fillet14
    fillet14_edges = [part.edges().sort_by_distance(p)[0] for p in [
        (225.297764534, 29.106366656, 3.175),
        (70.367134521, 29.030471993, 3.175),
    ]]
    fillet(fillet14_edges, radius=FILLET14_R)

    # Fillet15
    fillet15_edges = [part.edges().sort_by_distance(p)[0] for p in [
        (267.404601314, 50, 3.175),
        (91.336662528, 50, 3.175),
        (112.549865964, 50, 3.175),
        (244.695857174, 27.29125586, 3.175),
        (90.030119482, 27.480253519, 3.175),
    ]]
    fillet(fillet15_edges, radius=FILLET15_R)

    # Fillet16
    fillet16_edges = [part.edges().sort_by_distance(p)[0] for p in [
        (246.191397879, 50, 3.175),
    ]]
    fillet(fillet16_edges, radius=FILLET16_R)

    # Sketch9 → Cut-Extrude7 (cut)
    with SkipClean():  # the faces are left unmerged after this step: merging them gives an invalid solid
        with BuildSketch(Plane.XY.offset(6.35)):
            with BuildLine():
                Line((74.942764143, 21.421259548), (82.013831955, 28.49232736))
                ThreePointArc((82.013831955, 28.49232736), (84.528303669, 28.49232736), (84.528303669, 25.977855646))
                Line((84.528303669, 25.977855646), (77.457235857, 18.906787834))
                ThreePointArc((77.457235857, 18.906787834), (74.942764143, 18.906787834), (74.942764143, 21.421259548))
            make_face()
            with BuildLine():
                Line((227.342764143, 21.584835497), (234.413831955, 28.655903309))
                ThreePointArc((234.413831955, 28.655903309), (236.928303669, 28.655903309), (236.928303669, 26.141431595))
                Line((236.928303669, 26.141431595), (229.857235857, 19.070363783))
                ThreePointArc((229.857235857, 19.070363783), (227.342764143, 19.070363783), (227.342764143, 21.584835497))
            make_face()
        extrude(amount=-CUT_EXTRUDE7_DEPTH, mode=Mode.SUBTRACT)

    # Sketch10 → Boss-Extrude5 (add)
    # profile 1 of 3: a face of its own
    with SkipClean():  # the faces are left unmerged after this step: merging them gives an invalid solid
        with BuildSketch(Plane(origin=(0, 0, 0), x_dir=(-1, 0, 0), z_dir=(0, 0, -1)).offset(BOSS_EXTRUDE5_START)):
            with BuildLine():
                ThreePointArc((-67.194526904, 50), (-76.433322229, 43.826834324), (-74.265594716, 32.928932188))
                Line((-74.265594716, 32.928932188), (-72.848479306, 31.511816778))
                ThreePointArc((-72.848479306, 31.511816778), (-70.222953971, 29.625365286), (-67.132776867, 28.675161103))
                ThreePointArc((-67.132776867, 28.675161103), (-54.584312682, 25.583776849), (-42.962627059, 19.930721632))
                ThreePointArc((-42.962627059, 19.930721632), (-41.828685193, 19.205024398), (-40.71095078, 18.45460424))
                ThreePointArc((-40.71095078, 18.45460424), (-36.930649094, 15.635886475), (-33.378159261, 12.534972634))
                ThreePointArc((-33.378159261, 12.534972634), (-25.652977382, 9.847596586), (-18.506028464, 13.825227321))
                ThreePointArc((-18.506028464, 13.825227321), (-10.406477556, 20.623172037), (-0.126311649, 23.099654659))
                ThreePointArc((-0.126311649, 23.099654659), (8.202890478, 27.648769951), (8.980724779, 37.107365609))
                Line((8.980724779, 37.107365609), (7.272705295, 41.011790673))
                ThreePointArc((7.272705295, 41.011790673), (1.740585021, 47.553423041), (-6.469869897, 50))
                Line((-6.469869897, 50), (-67.194526904, 50))
            make_face()
            with Locations((-50.2, 26.164023691)):
                Circle(SKETCH10_R, mode=Mode.SUBTRACT)
            with BuildLine():
                Line((-69.3129454, 35.047350684), (-70.73006081, 36.464466094))
                ThreePointArc((-70.73006081, 36.464466094), (-71.813924567, 41.913417162), (-67.194526904, 45))
                Line((-67.194526904, 45), (-6.469869897, 45))
                ThreePointArc((-6.469869897, 45), (-0.996233285, 43.368948694), (2.691846898, 39.007860448))
                Line((2.691846898, 39.007860448), (4.399866381, 35.103435385))
                ThreePointArc((4.399866381, 35.103435385), (4.010949231, 30.374137556), (-0.153651832, 28.09957991))
                ThreePointArc((-0.153651832, 28.09957991), (-12.658961876, 25.087062088), (-22.511662331, 16.817700767))
                ThreePointArc((-22.511662331, 16.817700767), (-26.08513679, 14.8288854), (-29.947727729, 16.172573424))
                ThreePointArc((-29.947727729, 16.172573424), (-46.837281896, 27.753655452), (-66.455094181, 33.629022846))
                ThreePointArc((-66.455094181, 33.629022846), (-68.000182733, 34.104124938), (-69.3129454, 35.047350684))
            make_face(mode=Mode.SUBTRACT)
        # profile 2 of 3: a face of its own
        with BuildSketch(Plane(origin=(0, 0, 0), x_dir=(-1, 0, 0), z_dir=(0, 0, -1)).offset(BOSS_EXTRUDE5_START)):
            with BuildLine():
                ThreePointArc((-222.049262255, 50), (-231.28805758, 43.826834324), (-229.120330067, 32.928932188))
                Line((-229.120330067, 32.928932188), (-227.84247345, 31.651075572))
                ThreePointArc((-227.84247345, 31.651075572), (-225.148473717, 29.730965761), (-221.975427684, 28.794891452))
                ThreePointArc((-221.975427684, 28.794891452), (-202.106159082, 22.851738113), (-185.354998338, 10.624411336))
                ThreePointArc((-185.354998338, 10.624411336), (-177.7169483, 7.598630206), (-170.390122667, 11.315185866))
                ThreePointArc((-170.390122667, 11.315185866), (-152.4, 19.925), (-134.409877333, 11.315185866))
                ThreePointArc((-134.409877333, 11.315185866), (-127.0830517, 7.598630206), (-119.445001662, 10.624411336))
                ThreePointArc((-119.445001662, 10.624411336), (-111.941546557, 17.193098502), (-103.47246446, 22.458470097))
                ThreePointArc((-103.47246446, 22.458470097), (-98.164563741, 29.805562574), (-100.973163037, 38.423297073))
                Line((-100.973163037, 38.423297073), (-109.620933775, 47.071067812))
                ThreePointArc((-109.620933775, 47.071067812), (-112.865167264, 49.238795325), (-116.692001587, 50))
                Line((-116.692001587, 50), (-222.049262255, 50))
            make_face()
            with BuildLine():
                Line((-222.049262255, 45), (-116.692001587, 45))
                ThreePointArc((-116.692001587, 45), (-114.778584426, 44.619397663), (-113.156467681, 43.535533906))
                Line((-113.156467681, 43.535533906), (-104.508696943, 34.887763168))
                ThreePointArc((-104.508696943, 34.887763168), (-103.104397295, 30.578895918), (-105.758347654, 26.905349679))
                ThreePointArc((-105.758347654, 26.905349679), (-114.918098395, 21.210577706), (-123.033473552, 14.106202468))
                ThreePointArc((-123.033473552, 14.106202468), (-126.852498572, 12.593311904), (-130.515911388, 14.451589733))
                ThreePointArc((-130.515911388, 14.451589733), (-152.4, 24.925), (-174.284088612, 14.451589733))
                ThreePointArc((-174.284088612, 14.451589733), (-177.947501428, 12.593311904), (-181.766526448, 14.106202468))
                ThreePointArc((-181.766526448, 14.106202468), (-199.883774016, 27.330689399), (-221.373416661, 33.758517418))
                ThreePointArc((-221.373416661, 33.758517418), (-222.959939678, 34.226554572), (-224.306939544, 35.186609478))
                Line((-224.306939544, 35.186609478), (-225.584796161, 36.464466094))
                ThreePointArc((-225.584796161, 36.464466094), (-226.668659917, 41.913417162), (-222.049262255, 45))
            make_face(mode=Mode.SUBTRACT)
        # profile 3 of 3: a face of its own
        with BuildSketch(Plane(origin=(0, 0, 0), x_dir=(-1, 0, 0), z_dir=(0, 0, -1)).offset(BOSS_EXTRUDE5_START)):
            with BuildLine():
                ThreePointArc((-257.918824258, 22.181909427), (-252.690189928, 29.532193538), (-255.506229694, 38.10162838))
                Line((-255.506229694, 38.10162838), (-264.475669126, 47.071067812))
                ThreePointArc((-264.475669126, 47.071067812), (-267.719902614, 49.238795325), (-271.546736938, 50))
                Line((-271.546736938, 50), (-332.173947538, 50))
                ThreePointArc((-332.173947538, 50), (-340.300144637, 45.827943094), (-341.64575039, 36.792984141))
                Line((-341.64575039, 36.792984141), (-336.428348814, 21.383581349))
                ThreePointArc((-336.428348814, 21.383581349), (-329.483593889, 14.915162915), (-320.262725429, 17.161413762))
                ThreePointArc((-320.262725429, 17.161413762), (-302.54213412, 22.989389763), (-286.293971536, 13.825227321))
                ThreePointArc((-286.293971536, 13.825227321), (-279.147022618, 9.847596586), (-271.421840739, 12.534972634))
                ThreePointArc((-271.421840739, 12.534972634), (-264.998233798, 17.817411245), (-257.918824258, 22.181909427))
            make_face()
            with BuildLine():
                Line((-268.011203032, 43.535533906), (-259.0417636, 34.566094474))
                ThreePointArc((-259.0417636, 34.566094474), (-257.633743717, 30.281377053), (-260.248060882, 26.606234998))
                ThreePointArc((-260.248060882, 26.606234998), (-267.904808807, 21.885804259), (-274.852272271, 16.172573424))
                ThreePointArc((-274.852272271, 16.172573424), (-278.71486321, 14.8288854), (-282.288337669, 16.817700767))
                ThreePointArc((-282.288337669, 16.817700767), (-302.053418561, 27.965448153), (-323.609635695, 20.876005485))
                ThreePointArc((-323.609635695, 20.876005485), (-328.220069925, 19.752880062), (-331.692447387, 22.987089279))
                Line((-331.692447387, 22.987089279), (-336.909848964, 38.39649207))
                ThreePointArc((-336.909848964, 38.39649207), (-336.237046087, 42.913971547), (-332.173947538, 45))
                Line((-332.173947538, 45), (-271.546736938, 45))
                ThreePointArc((-271.546736938, 45), (-269.633319776, 44.619397663), (-268.011203032, 43.535533906))
            make_face(mode=Mode.SUBTRACT)
        extrude(amount=BOSS_EXTRUDE5_DEPTH)

    # Fillet17
    fillet17_edges = [part.edges().sort_by_distance(p)[0] for p in [
        (190.285940729, -7.208050345, 3.175),
        (267.051869464, -5.166105019, 3.175),
        (114.514059271, -7.208050345, 3.175),
        (37.748130536, -5.166105019, 3.175),
    ]]
    fillet(fillet17_edges, radius=FILLET17_R)

    # Sketch11 → Boss-Extrude6 (add)
    # profile 1 of 3: a face of its own
    with SkipClean():  # the faces are left unmerged after this step: merging them gives an invalid solid
        with BuildSketch(Plane(origin=(0, 0, 0), x_dir=(-1, 0, 0), z_dir=(0, 0, -1)).offset(BOSS_EXTRUDE6_START)):
            with BuildLine():
                ThreePointArc((2.691846898, 39.007860448), (-0.996233285, 43.368948694), (-6.469869897, 45))
                Line((-6.469869897, 45), (-67.194526904, 45))
                ThreePointArc((-67.194526904, 45), (-71.813924567, 41.913417162), (-70.73006081, 36.464466094))
                Line((-70.73006081, 36.464466094), (-69.3129454, 35.047350684))
                ThreePointArc((-69.3129454, 35.047350684), (-68.000182733, 34.104124938), (-66.455094181, 33.629022846))
                ThreePointArc((-66.455094181, 33.629022846), (-46.837281896, 27.753655452), (-29.947727729, 16.172573424))
                ThreePointArc((-29.947727729, 16.172573424), (-26.08513679, 14.8288854), (-22.511662331, 16.817700767))
                ThreePointArc((-22.511662331, 16.817700767), (-12.658961876, 25.087062088), (-0.153651832, 28.09957991))
                ThreePointArc((-0.153651832, 28.09957991), (4.010949231, 30.374137556), (4.399866381, 35.103435385))
                Line((4.399866381, 35.103435385), (2.691846898, 39.007860448))
            make_face()
            with BuildLine():
                Line((-67.194526904, 42), (-6.469869897, 42))
                ThreePointArc((-6.469869897, 42), (-2.638324268, 40.858264086), (-0.05666814, 37.805502314))
                Line((-0.05666814, 37.805502314), (1.651351343, 33.90107725))
                ThreePointArc((1.651351343, 33.90107725), (1.495784483, 32.009358119), (-0.170055943, 31.09953506))
                ThreePointArc((-0.170055943, 31.09953506), (-14.010452468, 27.765396119), (-24.915042651, 18.613184835))
                ThreePointArc((-24.915042651, 18.613184835), (-26.344432434, 17.817658688), (-27.88946881, 18.355133898))
                ThreePointArc((-27.88946881, 18.355133898), (-45.543132337, 30.460161857), (-66.048484569, 36.601339893))
                ThreePointArc((-66.048484569, 36.601339893), (-66.66651999, 36.791380729), (-67.191625057, 37.168671028))
                Line((-67.191625057, 37.168671028), (-68.608740467, 38.585786438))
                ThreePointArc((-68.608740467, 38.585786438), (-69.042285969, 40.765366865), (-67.194526904, 42))
            make_face(mode=Mode.SUBTRACT)
        # profile 2 of 3: a face of its own
        with BuildSketch(Plane(origin=(0, 0, 0), x_dir=(-1, 0, 0), z_dir=(0, 0, -1)).offset(BOSS_EXTRUDE6_START)):
            with BuildLine():
                ThreePointArc((-105.758347654, 26.905349679), (-103.104397295, 30.578895918), (-104.508696943, 34.887763168))
                Line((-104.508696943, 34.887763168), (-113.156467681, 43.535533906))
                ThreePointArc((-113.156467681, 43.535533906), (-114.778584426, 44.619397663), (-116.692001587, 45))
                Line((-116.692001587, 45), (-222.049262255, 45))
                ThreePointArc((-222.049262255, 45), (-226.668659917, 41.913417162), (-225.584796161, 36.464466094))
                Line((-225.584796161, 36.464466094), (-224.306939544, 35.186609478))
                ThreePointArc((-224.306939544, 35.186609478), (-222.959939678, 34.226554572), (-221.373416661, 33.758517418))
                ThreePointArc((-221.373416661, 33.758517418), (-199.883774016, 27.330689399), (-181.766526448, 14.106202468))
                ThreePointArc((-181.766526448, 14.106202468), (-177.947501428, 12.593311904), (-174.284088612, 14.451589733))
                ThreePointArc((-174.284088612, 14.451589733), (-152.4, 24.925), (-130.515911388, 14.451589733))
                ThreePointArc((-130.515911388, 14.451589733), (-126.852498572, 12.593311904), (-123.033473552, 14.106202468))
                ThreePointArc((-123.033473552, 14.106202468), (-114.918098395, 21.210577706), (-105.758347654, 26.905349679))
            make_face()
            with BuildLine():
                Line((-115.277788025, 41.414213562), (-106.630017287, 32.766442824))
                ThreePointArc((-106.630017287, 32.766442824), (-106.068297427, 31.042895924), (-107.129877571, 29.573477429))
                ThreePointArc((-107.129877571, 29.573477429), (-116.704029498, 23.621065228), (-125.186556687, 16.195277148))
                ThreePointArc((-125.186556687, 16.195277148), (-126.714166694, 15.590120922), (-128.179531821, 16.333432054))
                ThreePointArc((-128.179531821, 16.333432054), (-152.4, 27.925), (-176.620468179, 16.333432054))
                ThreePointArc((-176.620468179, 16.333432054), (-178.085833306, 15.590120922), (-179.613443313, 16.195277148))
                ThreePointArc((-179.613443313, 16.195277148), (-198.550342977, 30.01806017), (-221.012210047, 36.736692997))
                ThreePointArc((-221.012210047, 36.736692997), (-221.646819254, 36.923907859), (-222.185619201, 37.307929821))
                Line((-222.185619201, 37.307929821), (-223.463475817, 38.585786438))
                ThreePointArc((-223.463475817, 38.585786438), (-223.89702132, 40.765366865), (-222.049262255, 42))
                Line((-222.049262255, 42), (-116.692001587, 42))
                ThreePointArc((-116.692001587, 42), (-115.926634723, 41.847759065), (-115.277788025, 41.414213562))
            make_face(mode=Mode.SUBTRACT)
        # profile 3 of 3: a face of its own
        with BuildSketch(Plane(origin=(0, 0, 0), x_dir=(-1, 0, 0), z_dir=(0, 0, -1)).offset(BOSS_EXTRUDE6_START)):
            with BuildLine():
                ThreePointArc((-332.173947538, 45), (-336.237046087, 42.913971547), (-336.909848964, 38.39649207))
                Line((-336.909848964, 38.39649207), (-331.692447387, 22.987089279))
                ThreePointArc((-331.692447387, 22.987089279), (-328.220069925, 19.752880062), (-323.609635695, 20.876005485))
                ThreePointArc((-323.609635695, 20.876005485), (-302.053418561, 27.965448153), (-282.288337669, 16.817700767))
                ThreePointArc((-282.288337669, 16.817700767), (-278.71486321, 14.8288854), (-274.852272271, 16.172573424))
                ThreePointArc((-274.852272271, 16.172573424), (-267.904808807, 21.885804259), (-260.248060882, 26.606234998))
                ThreePointArc((-260.248060882, 26.606234998), (-257.633743717, 30.281377053), (-259.0417636, 34.566094474))
                Line((-259.0417636, 34.566094474), (-268.011203032, 43.535533906))
                ThreePointArc((-268.011203032, 43.535533906), (-269.633319776, 44.619397663), (-271.546736938, 45))
                Line((-271.546736938, 45), (-332.173947538, 45))
            make_face()
            with BuildLine():
                Line((-328.850906532, 23.949194037), (-334.068308108, 39.358596828))
                ThreePointArc((-334.068308108, 39.358596828), (-333.799186957, 41.165588619), (-332.173947538, 42))
                Line((-332.173947538, 42), (-271.546736938, 42))
                ThreePointArc((-271.546736938, 42), (-270.781370073, 41.847759065), (-270.132523375, 41.414213562))
                Line((-270.132523375, 41.414213562), (-261.163083943, 32.44477413))
                ThreePointArc((-261.163083943, 32.44477413), (-260.59987599, 30.730887162), (-261.645602856, 29.26083034))
                ThreePointArc((-261.645602856, 29.26083034), (-269.648753813, 24.326840067), (-276.91053119, 18.355133898))
                ThreePointArc((-276.91053119, 18.355133898), (-278.455567566, 17.817658688), (-279.884957349, 18.613184835))
                ThreePointArc((-279.884957349, 18.613184835), (-301.760189226, 30.951083187), (-325.617781855, 23.104760519))
                ThreePointArc((-325.617781855, 23.104760519), (-327.461955547, 22.65551035), (-328.850906532, 23.949194037))
            make_face(mode=Mode.SUBTRACT)
        extrude(amount=BOSS_EXTRUDE6_DEPTH)


solid = part.part
